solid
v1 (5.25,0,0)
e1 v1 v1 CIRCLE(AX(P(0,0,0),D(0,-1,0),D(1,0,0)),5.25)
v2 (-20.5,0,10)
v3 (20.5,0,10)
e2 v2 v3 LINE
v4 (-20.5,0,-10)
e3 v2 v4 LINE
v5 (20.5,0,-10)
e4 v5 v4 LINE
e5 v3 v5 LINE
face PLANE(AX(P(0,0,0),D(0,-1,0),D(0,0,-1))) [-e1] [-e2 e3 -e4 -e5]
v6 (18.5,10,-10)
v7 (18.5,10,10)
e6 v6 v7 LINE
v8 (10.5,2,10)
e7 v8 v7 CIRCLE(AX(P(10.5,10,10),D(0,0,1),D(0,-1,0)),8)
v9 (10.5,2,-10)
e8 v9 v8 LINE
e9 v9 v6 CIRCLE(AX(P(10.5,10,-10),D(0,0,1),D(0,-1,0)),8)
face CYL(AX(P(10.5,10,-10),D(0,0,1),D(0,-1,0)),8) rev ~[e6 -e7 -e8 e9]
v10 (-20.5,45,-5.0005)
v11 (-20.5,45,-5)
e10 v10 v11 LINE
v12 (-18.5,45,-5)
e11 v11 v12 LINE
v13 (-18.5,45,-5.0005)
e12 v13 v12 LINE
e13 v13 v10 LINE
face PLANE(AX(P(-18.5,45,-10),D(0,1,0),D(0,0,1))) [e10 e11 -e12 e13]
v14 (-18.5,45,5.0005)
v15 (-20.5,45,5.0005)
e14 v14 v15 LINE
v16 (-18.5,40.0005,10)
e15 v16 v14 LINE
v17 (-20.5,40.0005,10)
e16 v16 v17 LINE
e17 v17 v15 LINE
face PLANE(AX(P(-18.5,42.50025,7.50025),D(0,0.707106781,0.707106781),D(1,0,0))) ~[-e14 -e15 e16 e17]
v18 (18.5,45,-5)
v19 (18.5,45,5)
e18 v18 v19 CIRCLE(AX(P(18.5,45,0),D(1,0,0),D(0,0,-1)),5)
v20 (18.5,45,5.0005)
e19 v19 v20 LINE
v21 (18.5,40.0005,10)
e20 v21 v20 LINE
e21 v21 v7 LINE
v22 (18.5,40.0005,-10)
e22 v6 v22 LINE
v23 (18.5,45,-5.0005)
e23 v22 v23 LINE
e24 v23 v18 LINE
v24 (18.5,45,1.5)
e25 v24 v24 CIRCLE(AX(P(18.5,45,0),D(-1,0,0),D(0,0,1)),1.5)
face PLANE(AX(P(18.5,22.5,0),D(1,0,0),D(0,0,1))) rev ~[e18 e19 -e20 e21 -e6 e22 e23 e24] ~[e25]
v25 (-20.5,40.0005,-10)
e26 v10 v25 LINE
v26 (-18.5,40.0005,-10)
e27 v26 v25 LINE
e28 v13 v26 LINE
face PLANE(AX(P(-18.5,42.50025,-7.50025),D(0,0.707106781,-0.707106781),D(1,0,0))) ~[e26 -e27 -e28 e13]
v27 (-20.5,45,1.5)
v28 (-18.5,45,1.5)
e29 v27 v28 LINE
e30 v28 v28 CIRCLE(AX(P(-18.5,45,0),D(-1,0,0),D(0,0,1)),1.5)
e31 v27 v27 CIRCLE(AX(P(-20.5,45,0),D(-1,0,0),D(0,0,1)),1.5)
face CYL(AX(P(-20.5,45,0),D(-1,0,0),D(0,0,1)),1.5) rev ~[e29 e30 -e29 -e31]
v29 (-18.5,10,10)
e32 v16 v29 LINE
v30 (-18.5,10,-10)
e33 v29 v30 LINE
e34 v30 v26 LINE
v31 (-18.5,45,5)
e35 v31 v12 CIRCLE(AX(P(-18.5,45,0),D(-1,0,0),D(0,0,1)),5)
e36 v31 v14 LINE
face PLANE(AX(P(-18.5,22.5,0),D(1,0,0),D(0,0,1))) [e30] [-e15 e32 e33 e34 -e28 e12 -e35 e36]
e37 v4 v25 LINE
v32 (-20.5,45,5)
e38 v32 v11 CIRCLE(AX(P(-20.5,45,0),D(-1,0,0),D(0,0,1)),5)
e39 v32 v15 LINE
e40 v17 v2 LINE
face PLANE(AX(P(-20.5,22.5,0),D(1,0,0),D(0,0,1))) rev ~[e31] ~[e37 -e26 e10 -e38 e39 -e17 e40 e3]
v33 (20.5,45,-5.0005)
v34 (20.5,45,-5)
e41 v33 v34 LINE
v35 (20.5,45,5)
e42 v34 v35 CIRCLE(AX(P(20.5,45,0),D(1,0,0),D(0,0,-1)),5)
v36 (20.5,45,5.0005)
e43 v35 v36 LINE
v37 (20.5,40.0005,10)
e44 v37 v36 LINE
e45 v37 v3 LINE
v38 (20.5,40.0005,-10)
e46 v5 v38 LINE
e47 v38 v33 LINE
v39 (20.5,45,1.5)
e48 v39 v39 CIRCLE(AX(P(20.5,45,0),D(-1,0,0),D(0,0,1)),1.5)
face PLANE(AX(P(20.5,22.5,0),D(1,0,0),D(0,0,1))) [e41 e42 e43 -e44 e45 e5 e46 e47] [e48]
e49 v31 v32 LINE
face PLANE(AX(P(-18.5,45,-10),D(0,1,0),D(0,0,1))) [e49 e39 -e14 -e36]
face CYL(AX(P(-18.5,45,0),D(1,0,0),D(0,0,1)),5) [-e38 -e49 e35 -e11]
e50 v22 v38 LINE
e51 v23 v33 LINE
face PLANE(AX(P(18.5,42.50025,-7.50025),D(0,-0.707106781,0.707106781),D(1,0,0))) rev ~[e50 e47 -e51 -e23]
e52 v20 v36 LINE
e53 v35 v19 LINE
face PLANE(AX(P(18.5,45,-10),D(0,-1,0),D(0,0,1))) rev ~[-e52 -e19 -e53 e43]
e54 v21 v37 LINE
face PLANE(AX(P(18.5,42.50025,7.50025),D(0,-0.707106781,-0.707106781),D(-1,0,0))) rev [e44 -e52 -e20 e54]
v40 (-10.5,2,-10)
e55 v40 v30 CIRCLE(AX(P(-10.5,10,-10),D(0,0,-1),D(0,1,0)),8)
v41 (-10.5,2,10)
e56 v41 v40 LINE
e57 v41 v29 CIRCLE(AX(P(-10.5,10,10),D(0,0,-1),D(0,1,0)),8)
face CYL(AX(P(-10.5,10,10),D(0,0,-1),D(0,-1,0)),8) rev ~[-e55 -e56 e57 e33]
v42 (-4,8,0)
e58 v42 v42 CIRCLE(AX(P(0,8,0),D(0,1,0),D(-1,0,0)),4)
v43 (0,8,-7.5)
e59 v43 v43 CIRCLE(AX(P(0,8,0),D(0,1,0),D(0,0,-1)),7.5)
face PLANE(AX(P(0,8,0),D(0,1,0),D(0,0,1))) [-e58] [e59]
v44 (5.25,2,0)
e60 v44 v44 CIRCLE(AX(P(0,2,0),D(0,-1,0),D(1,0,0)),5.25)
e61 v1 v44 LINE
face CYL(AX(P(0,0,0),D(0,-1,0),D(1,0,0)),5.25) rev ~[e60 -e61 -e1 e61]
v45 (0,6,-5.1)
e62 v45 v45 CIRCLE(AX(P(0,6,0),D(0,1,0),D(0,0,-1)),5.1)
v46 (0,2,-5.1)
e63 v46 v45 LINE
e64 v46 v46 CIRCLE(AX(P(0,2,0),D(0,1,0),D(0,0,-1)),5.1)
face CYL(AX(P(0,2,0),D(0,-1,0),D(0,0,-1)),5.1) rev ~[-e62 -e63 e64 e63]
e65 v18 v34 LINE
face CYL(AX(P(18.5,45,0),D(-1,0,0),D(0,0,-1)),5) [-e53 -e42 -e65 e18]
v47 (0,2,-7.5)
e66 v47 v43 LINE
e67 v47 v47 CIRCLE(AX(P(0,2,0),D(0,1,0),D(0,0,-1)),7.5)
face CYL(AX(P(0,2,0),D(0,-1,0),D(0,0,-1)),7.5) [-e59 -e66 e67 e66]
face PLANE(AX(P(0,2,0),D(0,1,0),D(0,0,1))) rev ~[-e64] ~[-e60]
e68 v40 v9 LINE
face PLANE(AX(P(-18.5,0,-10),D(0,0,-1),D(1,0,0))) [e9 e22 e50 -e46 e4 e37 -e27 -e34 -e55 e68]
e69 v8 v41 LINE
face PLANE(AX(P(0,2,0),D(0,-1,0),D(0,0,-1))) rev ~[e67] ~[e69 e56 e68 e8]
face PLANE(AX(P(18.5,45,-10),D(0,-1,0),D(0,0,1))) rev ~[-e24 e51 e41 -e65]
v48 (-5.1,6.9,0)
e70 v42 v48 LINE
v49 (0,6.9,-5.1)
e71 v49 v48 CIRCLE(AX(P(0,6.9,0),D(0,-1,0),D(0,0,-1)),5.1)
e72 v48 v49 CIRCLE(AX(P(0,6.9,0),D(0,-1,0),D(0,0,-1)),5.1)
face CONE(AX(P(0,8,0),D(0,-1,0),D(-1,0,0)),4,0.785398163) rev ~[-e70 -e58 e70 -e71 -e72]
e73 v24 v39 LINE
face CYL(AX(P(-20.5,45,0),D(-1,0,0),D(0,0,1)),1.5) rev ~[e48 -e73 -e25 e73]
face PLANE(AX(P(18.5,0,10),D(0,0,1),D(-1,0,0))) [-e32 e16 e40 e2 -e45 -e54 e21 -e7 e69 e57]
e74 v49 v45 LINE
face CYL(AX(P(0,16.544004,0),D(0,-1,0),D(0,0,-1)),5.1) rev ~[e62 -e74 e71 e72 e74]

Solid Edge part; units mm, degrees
sketch "Sketch1" plane through (0, 0, 0) normal (0, -1, 0) x (1, 0, 0)
  line L0 (18.5, -10) -> (18.5, 10)
  line L1 (18.5, 10) -> (-18.5, 10)
  line L2 (-18.5, 10) -> (-18.5, -10)
  line L3 (-18.5, -10) -> (18.5, -10)
  circle A0 centre (0, 0) radius 5.25
  dimension "D1" = 10.5
  dimension "D2" = 37
  dimension "D3" = 20
extrude "Protrusion1" add sketch "Sketch1" against normal blind 2
sketch "Sketch2" plane through (-18.5, 1, 0) normal (-1, 0, 0) x (0, 0, 1)
  line L0 (10, 44) -> (10, -1)
  line L1 (10, -1) -> (-10, -1)
  line L2 (-10, -1) -> (-10, 44)
  line L3 (-10, 44) -> (10, 44)
  circle A0 centre (0, 44) radius 5
extrude "Extrusionsausprägung_2" add sketch "Sketch2" along normal blind 2
chamfer "Fase_1" distance 5 angle 45 1 edges at (-19.5, 45, 10)
chamfer "Fase_2" distance 5 angle 45 1 edges at (-19.5, 45, -10)
sketch "Sketch3" plane through (18.5, 1, 0) normal (1, 0, 0) x (0, 0, -1)
  line L0 (10, -1) -> (10, 44)
  line L1 (10, 44) -> (-10, 44)
  circle A0 centre (0, 44) radius 5
  line L2 (-10, 44) -> (-10, -1)
  line L3 (-10, -1) -> (10, -1)
extrude "Extrusionsausprägung_3" add sketch "Sketch3" along normal blind 2
sketch "Sketch4" plane through (-20.5, 17.5, 0) normal (-1, 0, 0) x (0, 0, 1)
  circle A0 centre (0, 27.5) radius 1.5
extrude "Extrusionsausschnitt_1" cut sketch "Sketch4" against normal blind 41
fillet "Verrundung_1" radius 8 1 edges at (18.5, 2, 0)
fillet "Verrundung_2" radius 8 1 edges at (-18.5, 2, 0)
chamfer "Fase_3" distance 5 angle 45 2 edges at (19.5, 45, -10) (19.5, 45, 10)
sketch "Sketch5" plane through (-0.5, 2, 0) normal (0, 1, 0) x (0, 0, -1)
  circle A0 centre (0, -0.5) radius 7.5
extrude "Extrusionsausprägung_4" add sketch "Sketch5" along normal blind 6
sketch "Sketch6" plane through (-0.5, 2, 0) normal (0, 1, 0) x (0, 0, -1)
  circle A0 centre (0, -0.5) radius 5.1
extrude "Extrusionsausschnitt_2" cut sketch "Sketch6" along normal blind 4
sketch "Sketch7" plane through (0, 8, 0) normal (0, 1, 0) x (-1, 0, 0)
  circle A0 centre (0, 0) radius 4
extrude "Extrusionsausschnitt_3" cut sketch "Sketch7" against normal blind 2
chamfer "Fase_4" distance 2 angle 45 1 edges at (4, 6, 0)
